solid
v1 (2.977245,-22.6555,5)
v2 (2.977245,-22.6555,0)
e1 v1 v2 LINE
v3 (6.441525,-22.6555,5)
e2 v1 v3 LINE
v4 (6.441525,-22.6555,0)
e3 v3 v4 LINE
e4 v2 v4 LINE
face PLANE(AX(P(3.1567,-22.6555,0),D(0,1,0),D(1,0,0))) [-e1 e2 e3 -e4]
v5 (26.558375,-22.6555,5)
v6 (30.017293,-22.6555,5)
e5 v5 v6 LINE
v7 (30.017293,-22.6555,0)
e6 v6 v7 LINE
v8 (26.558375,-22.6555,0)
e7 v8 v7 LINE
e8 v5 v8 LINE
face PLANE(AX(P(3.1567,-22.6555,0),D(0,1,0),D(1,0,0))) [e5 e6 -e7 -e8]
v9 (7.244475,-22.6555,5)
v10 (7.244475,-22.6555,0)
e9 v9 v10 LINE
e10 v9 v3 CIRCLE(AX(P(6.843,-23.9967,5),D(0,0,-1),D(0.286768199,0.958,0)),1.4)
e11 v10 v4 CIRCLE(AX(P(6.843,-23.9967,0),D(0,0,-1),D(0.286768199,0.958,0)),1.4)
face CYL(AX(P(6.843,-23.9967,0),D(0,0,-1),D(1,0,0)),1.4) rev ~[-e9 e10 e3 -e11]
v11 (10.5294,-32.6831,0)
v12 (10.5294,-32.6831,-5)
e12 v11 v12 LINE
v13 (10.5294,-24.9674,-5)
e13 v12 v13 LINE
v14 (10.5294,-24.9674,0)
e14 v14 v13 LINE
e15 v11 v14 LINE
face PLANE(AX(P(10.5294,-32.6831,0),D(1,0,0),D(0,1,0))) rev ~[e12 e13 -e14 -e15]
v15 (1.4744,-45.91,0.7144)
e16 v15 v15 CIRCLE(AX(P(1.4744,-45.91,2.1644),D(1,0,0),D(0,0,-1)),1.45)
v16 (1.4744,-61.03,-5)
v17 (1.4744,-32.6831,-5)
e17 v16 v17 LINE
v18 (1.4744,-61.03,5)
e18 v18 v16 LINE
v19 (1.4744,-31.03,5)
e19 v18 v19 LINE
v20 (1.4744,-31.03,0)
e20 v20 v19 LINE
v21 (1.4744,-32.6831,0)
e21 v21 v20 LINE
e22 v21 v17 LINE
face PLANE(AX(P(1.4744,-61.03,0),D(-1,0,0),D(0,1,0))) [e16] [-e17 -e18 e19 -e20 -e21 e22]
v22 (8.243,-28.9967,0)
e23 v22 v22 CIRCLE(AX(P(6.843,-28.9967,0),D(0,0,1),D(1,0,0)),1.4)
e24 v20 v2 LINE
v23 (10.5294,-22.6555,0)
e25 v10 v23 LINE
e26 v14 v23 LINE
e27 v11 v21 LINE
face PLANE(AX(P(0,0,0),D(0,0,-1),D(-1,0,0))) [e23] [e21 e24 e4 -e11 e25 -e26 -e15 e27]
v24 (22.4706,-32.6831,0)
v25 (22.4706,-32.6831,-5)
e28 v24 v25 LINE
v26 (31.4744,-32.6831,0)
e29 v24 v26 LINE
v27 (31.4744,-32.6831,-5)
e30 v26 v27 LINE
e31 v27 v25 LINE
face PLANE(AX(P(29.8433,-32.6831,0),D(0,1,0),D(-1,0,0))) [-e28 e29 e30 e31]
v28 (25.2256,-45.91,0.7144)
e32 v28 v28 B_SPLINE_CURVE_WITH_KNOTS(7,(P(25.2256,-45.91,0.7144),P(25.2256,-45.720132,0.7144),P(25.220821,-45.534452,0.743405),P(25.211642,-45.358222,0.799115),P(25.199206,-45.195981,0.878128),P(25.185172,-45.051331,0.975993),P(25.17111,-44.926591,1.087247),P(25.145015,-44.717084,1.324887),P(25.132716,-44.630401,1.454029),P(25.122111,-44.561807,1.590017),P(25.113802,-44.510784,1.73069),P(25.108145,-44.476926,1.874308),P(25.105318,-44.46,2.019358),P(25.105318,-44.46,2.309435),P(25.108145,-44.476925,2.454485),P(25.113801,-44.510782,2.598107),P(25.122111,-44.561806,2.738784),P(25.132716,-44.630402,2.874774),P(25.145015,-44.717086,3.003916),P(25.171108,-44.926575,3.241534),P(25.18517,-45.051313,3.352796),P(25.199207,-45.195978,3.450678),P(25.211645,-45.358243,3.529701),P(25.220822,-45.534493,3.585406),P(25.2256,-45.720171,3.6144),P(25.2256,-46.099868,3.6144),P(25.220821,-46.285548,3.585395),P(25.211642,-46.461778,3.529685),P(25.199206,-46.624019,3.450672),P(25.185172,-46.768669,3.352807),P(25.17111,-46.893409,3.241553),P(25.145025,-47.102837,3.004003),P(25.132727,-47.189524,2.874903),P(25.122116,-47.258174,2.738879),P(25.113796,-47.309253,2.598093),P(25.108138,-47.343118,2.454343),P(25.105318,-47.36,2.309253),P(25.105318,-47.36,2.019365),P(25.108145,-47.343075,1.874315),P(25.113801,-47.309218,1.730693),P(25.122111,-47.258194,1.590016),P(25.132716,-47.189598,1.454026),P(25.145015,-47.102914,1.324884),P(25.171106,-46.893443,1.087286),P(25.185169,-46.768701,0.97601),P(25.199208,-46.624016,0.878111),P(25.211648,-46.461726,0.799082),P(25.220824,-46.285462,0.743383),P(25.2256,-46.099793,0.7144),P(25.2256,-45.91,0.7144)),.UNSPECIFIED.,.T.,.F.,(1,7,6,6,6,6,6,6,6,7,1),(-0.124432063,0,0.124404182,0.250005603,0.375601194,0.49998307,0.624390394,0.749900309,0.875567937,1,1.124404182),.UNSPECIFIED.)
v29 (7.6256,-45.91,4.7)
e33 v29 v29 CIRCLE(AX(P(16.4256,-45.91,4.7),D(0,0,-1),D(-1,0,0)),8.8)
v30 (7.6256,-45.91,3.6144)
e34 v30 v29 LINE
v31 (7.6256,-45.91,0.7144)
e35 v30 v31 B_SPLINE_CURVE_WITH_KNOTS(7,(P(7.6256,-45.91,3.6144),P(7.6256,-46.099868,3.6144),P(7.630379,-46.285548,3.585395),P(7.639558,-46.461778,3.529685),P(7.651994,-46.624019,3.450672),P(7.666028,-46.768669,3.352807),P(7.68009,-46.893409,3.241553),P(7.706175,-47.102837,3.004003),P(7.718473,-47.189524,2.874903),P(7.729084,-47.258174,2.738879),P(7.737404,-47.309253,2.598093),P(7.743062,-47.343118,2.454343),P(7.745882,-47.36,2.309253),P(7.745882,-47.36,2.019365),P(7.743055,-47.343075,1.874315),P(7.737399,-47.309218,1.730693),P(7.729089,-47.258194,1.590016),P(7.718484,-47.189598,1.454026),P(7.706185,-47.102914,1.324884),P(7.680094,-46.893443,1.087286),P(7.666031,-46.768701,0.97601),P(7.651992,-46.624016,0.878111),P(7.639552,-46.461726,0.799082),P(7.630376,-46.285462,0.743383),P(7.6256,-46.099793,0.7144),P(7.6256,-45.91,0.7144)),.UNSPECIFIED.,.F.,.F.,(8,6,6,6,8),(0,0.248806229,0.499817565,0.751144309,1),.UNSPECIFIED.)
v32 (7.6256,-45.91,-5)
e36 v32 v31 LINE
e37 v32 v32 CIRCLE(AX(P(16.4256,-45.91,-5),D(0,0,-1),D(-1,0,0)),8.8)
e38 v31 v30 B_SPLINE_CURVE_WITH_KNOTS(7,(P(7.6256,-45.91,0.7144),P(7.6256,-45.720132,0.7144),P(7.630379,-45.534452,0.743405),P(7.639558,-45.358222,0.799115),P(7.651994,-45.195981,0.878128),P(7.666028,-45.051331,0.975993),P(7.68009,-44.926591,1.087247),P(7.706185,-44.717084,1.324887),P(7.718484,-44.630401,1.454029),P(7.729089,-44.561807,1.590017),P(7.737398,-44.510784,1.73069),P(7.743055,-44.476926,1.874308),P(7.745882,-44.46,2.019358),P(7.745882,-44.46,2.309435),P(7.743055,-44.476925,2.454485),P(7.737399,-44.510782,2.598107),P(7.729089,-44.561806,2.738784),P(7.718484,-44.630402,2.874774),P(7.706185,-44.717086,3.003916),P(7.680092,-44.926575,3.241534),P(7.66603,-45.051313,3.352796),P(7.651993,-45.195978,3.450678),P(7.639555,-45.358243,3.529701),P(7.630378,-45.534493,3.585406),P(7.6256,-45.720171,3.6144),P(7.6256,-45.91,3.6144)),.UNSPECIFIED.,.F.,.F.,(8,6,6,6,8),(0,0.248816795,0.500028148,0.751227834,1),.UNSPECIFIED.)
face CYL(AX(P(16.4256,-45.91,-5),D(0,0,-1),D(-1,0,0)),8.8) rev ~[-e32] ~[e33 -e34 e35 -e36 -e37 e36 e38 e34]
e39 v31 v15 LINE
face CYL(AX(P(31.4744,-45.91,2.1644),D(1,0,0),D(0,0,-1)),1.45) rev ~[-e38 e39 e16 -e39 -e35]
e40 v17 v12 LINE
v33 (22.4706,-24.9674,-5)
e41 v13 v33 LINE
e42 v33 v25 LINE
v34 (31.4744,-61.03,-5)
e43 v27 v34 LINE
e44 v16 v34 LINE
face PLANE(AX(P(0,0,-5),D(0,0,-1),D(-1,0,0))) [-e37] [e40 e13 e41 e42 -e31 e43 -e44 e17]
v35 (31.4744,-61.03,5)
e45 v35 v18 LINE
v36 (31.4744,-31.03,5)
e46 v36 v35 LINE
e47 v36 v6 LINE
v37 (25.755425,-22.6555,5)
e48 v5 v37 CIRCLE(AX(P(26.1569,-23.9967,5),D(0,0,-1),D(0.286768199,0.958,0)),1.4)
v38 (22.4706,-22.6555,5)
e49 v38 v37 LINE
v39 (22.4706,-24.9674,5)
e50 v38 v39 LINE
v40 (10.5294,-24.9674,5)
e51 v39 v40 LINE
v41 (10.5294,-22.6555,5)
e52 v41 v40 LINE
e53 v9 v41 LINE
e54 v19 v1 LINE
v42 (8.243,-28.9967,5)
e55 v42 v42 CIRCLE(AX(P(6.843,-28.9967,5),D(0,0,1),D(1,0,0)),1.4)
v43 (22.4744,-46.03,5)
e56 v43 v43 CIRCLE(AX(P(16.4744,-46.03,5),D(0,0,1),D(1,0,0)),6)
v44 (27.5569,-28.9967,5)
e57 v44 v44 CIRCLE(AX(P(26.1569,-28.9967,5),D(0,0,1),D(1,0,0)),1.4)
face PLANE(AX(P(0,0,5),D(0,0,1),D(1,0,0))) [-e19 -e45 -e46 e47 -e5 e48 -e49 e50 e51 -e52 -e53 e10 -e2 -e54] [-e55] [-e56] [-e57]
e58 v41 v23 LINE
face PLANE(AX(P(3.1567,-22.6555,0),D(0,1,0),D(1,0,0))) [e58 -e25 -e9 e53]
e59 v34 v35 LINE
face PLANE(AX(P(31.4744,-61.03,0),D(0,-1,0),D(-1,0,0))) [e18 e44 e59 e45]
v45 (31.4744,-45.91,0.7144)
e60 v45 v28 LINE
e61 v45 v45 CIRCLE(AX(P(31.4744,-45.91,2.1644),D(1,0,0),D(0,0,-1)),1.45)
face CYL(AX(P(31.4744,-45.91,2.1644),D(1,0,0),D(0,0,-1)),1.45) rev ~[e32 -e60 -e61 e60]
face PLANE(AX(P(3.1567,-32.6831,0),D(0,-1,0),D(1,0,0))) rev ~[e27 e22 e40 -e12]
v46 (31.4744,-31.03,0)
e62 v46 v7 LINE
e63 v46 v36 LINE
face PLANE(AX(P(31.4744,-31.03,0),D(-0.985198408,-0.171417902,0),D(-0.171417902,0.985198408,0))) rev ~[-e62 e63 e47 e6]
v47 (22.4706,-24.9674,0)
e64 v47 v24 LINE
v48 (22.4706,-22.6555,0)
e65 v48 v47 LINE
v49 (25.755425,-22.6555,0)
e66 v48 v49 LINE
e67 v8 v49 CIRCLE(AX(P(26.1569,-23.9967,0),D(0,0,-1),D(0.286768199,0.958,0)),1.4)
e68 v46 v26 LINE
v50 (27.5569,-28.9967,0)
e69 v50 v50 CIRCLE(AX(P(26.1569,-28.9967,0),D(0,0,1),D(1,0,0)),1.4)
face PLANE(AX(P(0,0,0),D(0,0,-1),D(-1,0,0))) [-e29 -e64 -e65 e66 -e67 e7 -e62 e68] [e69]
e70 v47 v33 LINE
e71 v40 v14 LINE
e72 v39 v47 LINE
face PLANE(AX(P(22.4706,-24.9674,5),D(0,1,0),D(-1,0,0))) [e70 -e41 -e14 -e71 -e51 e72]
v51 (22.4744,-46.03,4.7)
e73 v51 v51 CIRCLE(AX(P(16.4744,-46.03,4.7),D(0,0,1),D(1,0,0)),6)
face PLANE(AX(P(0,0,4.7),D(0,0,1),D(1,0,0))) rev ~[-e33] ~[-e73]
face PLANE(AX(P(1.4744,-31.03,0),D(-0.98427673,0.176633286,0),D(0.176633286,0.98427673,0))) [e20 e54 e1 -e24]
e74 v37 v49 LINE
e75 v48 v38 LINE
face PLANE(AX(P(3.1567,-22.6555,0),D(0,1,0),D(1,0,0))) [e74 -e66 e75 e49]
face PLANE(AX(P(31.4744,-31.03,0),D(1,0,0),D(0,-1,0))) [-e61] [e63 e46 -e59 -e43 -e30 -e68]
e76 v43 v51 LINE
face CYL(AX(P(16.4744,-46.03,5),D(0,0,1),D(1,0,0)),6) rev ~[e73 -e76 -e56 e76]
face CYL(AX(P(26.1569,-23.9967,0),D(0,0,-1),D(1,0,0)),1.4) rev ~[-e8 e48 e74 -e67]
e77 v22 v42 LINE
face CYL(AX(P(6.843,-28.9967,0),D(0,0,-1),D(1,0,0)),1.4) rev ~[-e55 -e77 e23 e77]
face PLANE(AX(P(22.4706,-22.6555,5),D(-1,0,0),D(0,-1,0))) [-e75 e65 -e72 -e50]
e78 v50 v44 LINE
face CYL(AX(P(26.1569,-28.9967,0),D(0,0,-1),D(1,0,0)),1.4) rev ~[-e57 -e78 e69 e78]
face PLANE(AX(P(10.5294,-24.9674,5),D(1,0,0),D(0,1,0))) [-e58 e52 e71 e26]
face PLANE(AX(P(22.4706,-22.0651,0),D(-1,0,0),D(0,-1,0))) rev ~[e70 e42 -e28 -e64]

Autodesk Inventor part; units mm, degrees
ref_plane "YZ Plane" through (0, 0, 0) normal (1, 0, 0) x (0, 1, 0)
ref_plane "XZ Plane" through (0, 0, 0) normal (0, 1, 0) x (-1, 0, 0)
ref_plane "XY Plane" through (0, 0, 0) normal (0, 0, 1) x (1, 0, 0)
ref_plane "Work Plane1" through (0, 0, 0) normal (0, 0, 1) x (1, 0, 0)
sketch "Sketch1" plane through (0, 0, 0) normal (0, 0, 1) x (1, 0, 0)
  circle A0 centre (6.843, -28.9967) radius 1.4 projected
  circle A1 centre (26.1569, -28.9967) radius 1.4 projected
  circle A2 centre (26.1569, -23.9967) radius 1.4 projected
  circle A3 centre (6.843, -23.9967) radius 1.4 projected
  line L0 (0.4643, -12) -> (0, -12) construction
  line L1 (3.1567, -14.6923) -> (0.4643, -12) construction
  line L2 (3.1567, -32.6831) -> (3.1567, -14.6923) construction
  line L3 (10.5294, -32.6831) -> (3.1567, -32.6831) projected
  line L4 (10.5294, -14.6923) -> (10.5294, -32.6831) construction
  line L5 (9, -11) -> (10.5294, -14.6923) construction
  line L6 (2.8, -11) -> (9, -11) construction
  line L7 (2.8, 0) -> (2.8, -11) construction
  line L8 (30.2, 0) -> (2.8, 0) construction
  line L9 (30.2, 0) -> (30.2, -11) construction
  line L10 (24, -11) -> (30.2, -11) construction
  line L11 (24, -11) -> (22.4706, -14.6923) construction
  line L12 (22.4706, -14.6923) -> (22.4706, -32.6831) construction
  line L13 (22.4706, -32.6831) -> (29.8433, -32.6831) projected
  line L14 (29.8433, -32.6831) -> (29.8433, -14.6923) construction
  line L15 (29.8433, -14.6923) -> (32.5357, -12) construction
  line L16 (33, -12) -> (32.5357, -12) construction
  line L17 (33, -12) -> (33, 5) construction
  line L18 (0, 5) -> (0, -12) construction
  circle A4 centre (16.4744, -46.03) radius 10 projected
  circle A5 centre (16.4744, -46.03) radius 12.5
  line L19 (31.4744, -31.03) -> (1.4744, -31.03) construction
  line L20 (1.4744, -31.03) -> (1.4744, -61.03) construction
  line L21 (1.4744, -61.03) -> (31.4744, -61.03) construction
  line L22 (31.4744, -61.03) -> (31.4744, -31.03) construction
  line L23 (31.4744, -31.03) -> (1.4744, -61.03) construction
  line L24 (1.4744, -31.03) -> (31.4744, -61.03) construction
  line L25 (31.4744, -61.03) -> (1.4744, -61.03)
  line L26 (1.4744, -61.03) -> (1.4744, -31.03)
  line L27 (1.4744, -31.03) -> (31.4744, -31.03)
  line L28 (31.4744, -31.03) -> (31.4744, -61.03)
  line L29 (31.4744, -61.03) -> (1.4744, -31.03) construction
  line L30 (1.4744, -61.03) -> (31.4744, -31.03) construction
  line L31 (1.4744, -31.03) -> (3.1567, -21.6555)
  line L32 (3.1567, -21.6555) -> (29.8433, -21.6555)
  line L33 (31.4744, -31.03) -> (29.8433, -21.6555)
  circle A6 centre (15.4444, 14.8) radius 2 projected
  line L34 (19.4444, 18.8) -> (33, 5) projected
  line L35 (11.4444, 18.8) -> (19.4444, 18.8) projected
  line L36 (0, 5) -> (11.4444, 18.8) projected
  circle A7 centre (3.9444, 3.3) radius 1.45 projected
  circle A8 centre (26.9444, 3.3) radius 1.45 projected
  point P0 (0, 0)
  dimension "d0" = 25
  dimension "d1" = 30
  dimension "d2" = 30
extrude "Extrusion1" add sketch "Sketch1" along normal blind 5 contours L25 L26 L27 L28 | L27 L31 L32 L33
sketch "Sketch2" plane through (0, 0, 0) normal (0, 0, -1) x (-1, 0, 0)
  circle A0 centre (-16.4744, -46.03) radius 12.5 projected
  circle A1 centre (-16.4744, -46.03) radius 10.5
  line L0 (0.4956, -63) -> (-33.4444, -63) projected
  circle A2 centre (-16.4744, -46.03) radius 12.5 projected
  arc A3 (-23.9744, -56.03) -> (-8.9744, -56.03) centre (-16.4744, -46.03) ccw
  arc A4 (-21.3847, -34.5348) -> (-28.8847, -47.5252) centre (-16.4744, -46.03) ccw
  arc A5 (-4.0642, -47.5252) -> (-11.5642, -34.5348) centre (-16.4744, -46.03) ccw
  point P0 (0, 0)
  dimension "d5" = 21
extrude "Extrusion2" add sketch "Sketch2" against normal up to surface (5 mm away)
sketch "Sketch3" plane through (0, 0, 0) normal (0, 0, -1) x (-1, 0, 0)
  line L0 (-30.5357, -14) -> (-24, -14) construction
  line L1 (-30.5357, -14) -> (-29.8433, -14.6923) construction
  line L2 (-29.8433, -14.6923) -> (-29.8433, -32.6831) construction
  line L3 (-29.8433, -32.6831) -> (-22.4706, -32.6831) projected
  line L4 (-22.4706, -32.6831) -> (-10.5294, -32.6831)
  line L5 (-10.5294, -32.6831) -> (-10.5294, -22.0651)
  line L6 (-10.5294, -22.0651) -> (-22.4706, -22.0651)
  line L7 (-22.4706, -22.0651) -> (-22.4706, -32.6831)
  circle A0 centre (-6.843, -23.9967) radius 1.4 construction
  circle A1 centre (-26.1569, -23.9967) radius 1.4 construction
  circle A2 centre (-26.1569, -28.9967) radius 1.4 construction
  circle A3 centre (-6.843, -28.9967) radius 1.4 construction
  line L8 (-3.1567, -21.6555) -> (-1.4744, -31.03) construction
  line L9 (-29.8433, -21.6555) -> (-3.1567, -21.6555) construction
  line L10 (-31.4744, -31.03) -> (-29.8433, -21.6555) construction
  line L11 (-31.4744, -61.03) -> (-31.4744, -31.03) construction
  line L12 (-1.4744, -61.03) -> (-31.4744, -61.03) projected
  line L13 (-1.4744, -31.03) -> (-1.4744, -61.03) construction
  line L14 (-31.4744, -32.6831) -> (-29.8433, -32.6831)
  line L15 (-3.1567, -32.6831) -> (-1.4744, -32.6831)
  line L16 (-31.4744, -61.03) -> (-1.4744, -61.03)
  line L17 (-1.4744, -61.03) -> (-1.4744, -32.6831)
  line L18 (-1.4744, -32.6831) -> (-31.4744, -32.6831)
  line L19 (-31.4744, -32.6831) -> (-31.4744, -61.03)
  circle A4 centre (-26.1569, -28.9967) radius 1.4 projected
  circle A5 centre (-26.1569, -23.9967) radius 1.4 projected
  line L20 (-24, -14) -> (-24, -11) projected
  line L21 (-22.4706, -32.6831) -> (-22.4706, -14.6923) projected
  line L22 (-22.4706, -14.6923) -> (-24, -11) projected
  circle A6 centre (-16.4256, -45.91) radius 10.6939 projected
  point P0 (0, 0)
extrude "Extrusion4" add sketch "Sketch3" along normal blind 5 contours L3 L4 L18 L15 L17 L12 L19 L14 | L7 L6 L5 L4
sketch "Sketch4" plane through (3.1567, -21.6555, 0) normal (0, 1, 0) x (1, 0, 0)
  line L0 (-6.8596, 8.2929) -> (32.2101, 8.2929)
  line L1 (32.2101, 8.2929) -> (32.2101, -9.1799)
  line L2 (32.2101, -9.1799) -> (-6.8596, -9.1799)
  line L3 (-6.8596, -9.1799) -> (-6.8596, 8.2929)
  point P0 (-3.1567, 0)
extrude "Extrusion5" cut sketch "Sketch4" against normal blind 1
sketch "Sketch5" plane through (0, 0, 5) normal (0, 0, 1) x (1, 0, 0)
  circle A0 centre (6.843, -28.9967) radius 1.4 projected
  circle A1 centre (26.1569, -28.9967) radius 1.4 projected
  line L0 (25.7553, -22.6555) -> (7.2447, -22.6555) projected
  arc A2 (6.4414, -22.6555) -> (7.2447, -22.6555) centre (6.843, -23.9967) ccw projected
  line L1 (6.4414, -22.6555) -> (2.9772, -22.6555) projected
  line L2 (2.9772, -22.6555) -> (1.4744, -31.03) projected
  line L3 (1.4744, -31.03) -> (1.4744, -61.03) projected
  line L4 (1.4744, -61.03) -> (31.4744, -61.03) projected
  line L5 (31.4744, -61.03) -> (31.4744, -31.03) projected
  line L6 (31.4744, -31.03) -> (30.0173, -22.6555) projected
  line L7 (30.0173, -22.6555) -> (26.5586, -22.6555) projected
  arc A3 (25.7553, -22.6555) -> (26.5586, -22.6555) centre (26.1569, -23.9967) ccw projected
  line L8 (10.5294, -20.3437) -> (22.4706, -20.3437)
  line L9 (22.4706, -20.3437) -> (22.4706, -24.9674)
  line L10 (22.4706, -24.9674) -> (10.5294, -24.9674)
  line L11 (10.5294, -24.9674) -> (10.5294, -20.3437)
  line L12 (10.5294, -22.6555) -> (22.4706, -22.6555) projected
  line L13 (10.5294, -20.3437) -> (22.4706, -24.9674) construction
  line L14 (22.4706, -20.3437) -> (10.5294, -24.9674) construction
  point P0 (0, 0)
  point P1 (16.5, -22.6555)
extrude "Extrusion6" cut sketch "Sketch5" against normal through all contours L9 L10 L11 L0 | L0 L11 L8 L9
ref_plane "Work Plane2" through (16.4744, -61.03, 5) normal (1, 0, 0) x (0, 0, -1)
sketch "Sketch6" plane through (16.4744, -61.03, 5) normal (1, 0, 0) x (0, 0, -1)
  line L0 (0, 5.17) -> (0.15, 5.17)
  line L1 (0, 5.17) -> (0.15, 5.17) construction
  line L2 (0.15, 5.17) -> (0.3567, 4.812)
  line L3 (0.3567, 4.812) -> (0.5067, 4.812)
  line L4 (0.5067, 4.812) -> (0.7133, 5.17)
  line L5 (0.7133, 5.17) -> (0.7133, 4.17)
  line L6 (0.7133, 4.17) -> (0, 4.17)
  line L7 (0, 4.17) -> (0, 5.17)
  line L8 (-2, 15.12) -> (12, 15.12) projected
  point P0 (5, 61.03)
  point P1 (0, 0)
  dimension "d16" = 0.15
  dimension "d17" = 0
  dimension "d18" = 120
  dimension "d19" = 0.15
  dimension "d20" = 120
  dimension "d21" = 1
  dimension "d22" = 0.7133
  dimension "d33" = 9.95
coil "Coil1" sketch "Sketch6" operation add axis through (16.4744, -45.91, 0) along (0, 0, -1) pitch 0.7133 turns 13 hand right
sketch "Sketch7" plane through (0, 0, 5) normal (0, 0, 1) x (1, 0, 0)
  circle A0 centre (16.4744, -46.03) radius 10.5 projected
  circle A1 centre (16.4744, -46.03) radius 6
  point P0 (0, 0)
  point P1 (16.4744, -56.53)
  dimension "d34" = 12
extrude "Extrusion7" add sketch "Sketch7" against normal blind 0.3
sketch "Sketch8" plane through (0, 0, -5) normal (0, 0, -1) x (-1, 0, 0)
  circle A0 centre (-16.4256, -45.91) radius 10.6939 projected
  circle A1 centre (-16.4256, -45.91) radius 8.8
  point P0 (0, 0)
  dimension "d37" = 17.6
extrude "Extrusion8" add sketch "Sketch8" against normal up to surface (9.7 mm away)
sketch "Sketch9" plane through (31.4744, -61.03, 5) normal (1, 0, 0) x (0, 0, -1)
  line L0 (0.3, 6.32) -> (0.3, 23.92) projected
  line L1 (10, 23.92) -> (10, 6.32) projected
  circle A0 centre (2.8356, 15.12) radius 1.45
  point P0 (5, 61.03)
  dimension "d40" = 2.9
extrude "Extrusion9" cut sketch "Sketch9" against normal through all
equation "\"d19\" = d16"
equation "\"d20\" = d18"
properties part number "30_Cube_Z_Focus_MGN_NEMA_adapter_M12"
